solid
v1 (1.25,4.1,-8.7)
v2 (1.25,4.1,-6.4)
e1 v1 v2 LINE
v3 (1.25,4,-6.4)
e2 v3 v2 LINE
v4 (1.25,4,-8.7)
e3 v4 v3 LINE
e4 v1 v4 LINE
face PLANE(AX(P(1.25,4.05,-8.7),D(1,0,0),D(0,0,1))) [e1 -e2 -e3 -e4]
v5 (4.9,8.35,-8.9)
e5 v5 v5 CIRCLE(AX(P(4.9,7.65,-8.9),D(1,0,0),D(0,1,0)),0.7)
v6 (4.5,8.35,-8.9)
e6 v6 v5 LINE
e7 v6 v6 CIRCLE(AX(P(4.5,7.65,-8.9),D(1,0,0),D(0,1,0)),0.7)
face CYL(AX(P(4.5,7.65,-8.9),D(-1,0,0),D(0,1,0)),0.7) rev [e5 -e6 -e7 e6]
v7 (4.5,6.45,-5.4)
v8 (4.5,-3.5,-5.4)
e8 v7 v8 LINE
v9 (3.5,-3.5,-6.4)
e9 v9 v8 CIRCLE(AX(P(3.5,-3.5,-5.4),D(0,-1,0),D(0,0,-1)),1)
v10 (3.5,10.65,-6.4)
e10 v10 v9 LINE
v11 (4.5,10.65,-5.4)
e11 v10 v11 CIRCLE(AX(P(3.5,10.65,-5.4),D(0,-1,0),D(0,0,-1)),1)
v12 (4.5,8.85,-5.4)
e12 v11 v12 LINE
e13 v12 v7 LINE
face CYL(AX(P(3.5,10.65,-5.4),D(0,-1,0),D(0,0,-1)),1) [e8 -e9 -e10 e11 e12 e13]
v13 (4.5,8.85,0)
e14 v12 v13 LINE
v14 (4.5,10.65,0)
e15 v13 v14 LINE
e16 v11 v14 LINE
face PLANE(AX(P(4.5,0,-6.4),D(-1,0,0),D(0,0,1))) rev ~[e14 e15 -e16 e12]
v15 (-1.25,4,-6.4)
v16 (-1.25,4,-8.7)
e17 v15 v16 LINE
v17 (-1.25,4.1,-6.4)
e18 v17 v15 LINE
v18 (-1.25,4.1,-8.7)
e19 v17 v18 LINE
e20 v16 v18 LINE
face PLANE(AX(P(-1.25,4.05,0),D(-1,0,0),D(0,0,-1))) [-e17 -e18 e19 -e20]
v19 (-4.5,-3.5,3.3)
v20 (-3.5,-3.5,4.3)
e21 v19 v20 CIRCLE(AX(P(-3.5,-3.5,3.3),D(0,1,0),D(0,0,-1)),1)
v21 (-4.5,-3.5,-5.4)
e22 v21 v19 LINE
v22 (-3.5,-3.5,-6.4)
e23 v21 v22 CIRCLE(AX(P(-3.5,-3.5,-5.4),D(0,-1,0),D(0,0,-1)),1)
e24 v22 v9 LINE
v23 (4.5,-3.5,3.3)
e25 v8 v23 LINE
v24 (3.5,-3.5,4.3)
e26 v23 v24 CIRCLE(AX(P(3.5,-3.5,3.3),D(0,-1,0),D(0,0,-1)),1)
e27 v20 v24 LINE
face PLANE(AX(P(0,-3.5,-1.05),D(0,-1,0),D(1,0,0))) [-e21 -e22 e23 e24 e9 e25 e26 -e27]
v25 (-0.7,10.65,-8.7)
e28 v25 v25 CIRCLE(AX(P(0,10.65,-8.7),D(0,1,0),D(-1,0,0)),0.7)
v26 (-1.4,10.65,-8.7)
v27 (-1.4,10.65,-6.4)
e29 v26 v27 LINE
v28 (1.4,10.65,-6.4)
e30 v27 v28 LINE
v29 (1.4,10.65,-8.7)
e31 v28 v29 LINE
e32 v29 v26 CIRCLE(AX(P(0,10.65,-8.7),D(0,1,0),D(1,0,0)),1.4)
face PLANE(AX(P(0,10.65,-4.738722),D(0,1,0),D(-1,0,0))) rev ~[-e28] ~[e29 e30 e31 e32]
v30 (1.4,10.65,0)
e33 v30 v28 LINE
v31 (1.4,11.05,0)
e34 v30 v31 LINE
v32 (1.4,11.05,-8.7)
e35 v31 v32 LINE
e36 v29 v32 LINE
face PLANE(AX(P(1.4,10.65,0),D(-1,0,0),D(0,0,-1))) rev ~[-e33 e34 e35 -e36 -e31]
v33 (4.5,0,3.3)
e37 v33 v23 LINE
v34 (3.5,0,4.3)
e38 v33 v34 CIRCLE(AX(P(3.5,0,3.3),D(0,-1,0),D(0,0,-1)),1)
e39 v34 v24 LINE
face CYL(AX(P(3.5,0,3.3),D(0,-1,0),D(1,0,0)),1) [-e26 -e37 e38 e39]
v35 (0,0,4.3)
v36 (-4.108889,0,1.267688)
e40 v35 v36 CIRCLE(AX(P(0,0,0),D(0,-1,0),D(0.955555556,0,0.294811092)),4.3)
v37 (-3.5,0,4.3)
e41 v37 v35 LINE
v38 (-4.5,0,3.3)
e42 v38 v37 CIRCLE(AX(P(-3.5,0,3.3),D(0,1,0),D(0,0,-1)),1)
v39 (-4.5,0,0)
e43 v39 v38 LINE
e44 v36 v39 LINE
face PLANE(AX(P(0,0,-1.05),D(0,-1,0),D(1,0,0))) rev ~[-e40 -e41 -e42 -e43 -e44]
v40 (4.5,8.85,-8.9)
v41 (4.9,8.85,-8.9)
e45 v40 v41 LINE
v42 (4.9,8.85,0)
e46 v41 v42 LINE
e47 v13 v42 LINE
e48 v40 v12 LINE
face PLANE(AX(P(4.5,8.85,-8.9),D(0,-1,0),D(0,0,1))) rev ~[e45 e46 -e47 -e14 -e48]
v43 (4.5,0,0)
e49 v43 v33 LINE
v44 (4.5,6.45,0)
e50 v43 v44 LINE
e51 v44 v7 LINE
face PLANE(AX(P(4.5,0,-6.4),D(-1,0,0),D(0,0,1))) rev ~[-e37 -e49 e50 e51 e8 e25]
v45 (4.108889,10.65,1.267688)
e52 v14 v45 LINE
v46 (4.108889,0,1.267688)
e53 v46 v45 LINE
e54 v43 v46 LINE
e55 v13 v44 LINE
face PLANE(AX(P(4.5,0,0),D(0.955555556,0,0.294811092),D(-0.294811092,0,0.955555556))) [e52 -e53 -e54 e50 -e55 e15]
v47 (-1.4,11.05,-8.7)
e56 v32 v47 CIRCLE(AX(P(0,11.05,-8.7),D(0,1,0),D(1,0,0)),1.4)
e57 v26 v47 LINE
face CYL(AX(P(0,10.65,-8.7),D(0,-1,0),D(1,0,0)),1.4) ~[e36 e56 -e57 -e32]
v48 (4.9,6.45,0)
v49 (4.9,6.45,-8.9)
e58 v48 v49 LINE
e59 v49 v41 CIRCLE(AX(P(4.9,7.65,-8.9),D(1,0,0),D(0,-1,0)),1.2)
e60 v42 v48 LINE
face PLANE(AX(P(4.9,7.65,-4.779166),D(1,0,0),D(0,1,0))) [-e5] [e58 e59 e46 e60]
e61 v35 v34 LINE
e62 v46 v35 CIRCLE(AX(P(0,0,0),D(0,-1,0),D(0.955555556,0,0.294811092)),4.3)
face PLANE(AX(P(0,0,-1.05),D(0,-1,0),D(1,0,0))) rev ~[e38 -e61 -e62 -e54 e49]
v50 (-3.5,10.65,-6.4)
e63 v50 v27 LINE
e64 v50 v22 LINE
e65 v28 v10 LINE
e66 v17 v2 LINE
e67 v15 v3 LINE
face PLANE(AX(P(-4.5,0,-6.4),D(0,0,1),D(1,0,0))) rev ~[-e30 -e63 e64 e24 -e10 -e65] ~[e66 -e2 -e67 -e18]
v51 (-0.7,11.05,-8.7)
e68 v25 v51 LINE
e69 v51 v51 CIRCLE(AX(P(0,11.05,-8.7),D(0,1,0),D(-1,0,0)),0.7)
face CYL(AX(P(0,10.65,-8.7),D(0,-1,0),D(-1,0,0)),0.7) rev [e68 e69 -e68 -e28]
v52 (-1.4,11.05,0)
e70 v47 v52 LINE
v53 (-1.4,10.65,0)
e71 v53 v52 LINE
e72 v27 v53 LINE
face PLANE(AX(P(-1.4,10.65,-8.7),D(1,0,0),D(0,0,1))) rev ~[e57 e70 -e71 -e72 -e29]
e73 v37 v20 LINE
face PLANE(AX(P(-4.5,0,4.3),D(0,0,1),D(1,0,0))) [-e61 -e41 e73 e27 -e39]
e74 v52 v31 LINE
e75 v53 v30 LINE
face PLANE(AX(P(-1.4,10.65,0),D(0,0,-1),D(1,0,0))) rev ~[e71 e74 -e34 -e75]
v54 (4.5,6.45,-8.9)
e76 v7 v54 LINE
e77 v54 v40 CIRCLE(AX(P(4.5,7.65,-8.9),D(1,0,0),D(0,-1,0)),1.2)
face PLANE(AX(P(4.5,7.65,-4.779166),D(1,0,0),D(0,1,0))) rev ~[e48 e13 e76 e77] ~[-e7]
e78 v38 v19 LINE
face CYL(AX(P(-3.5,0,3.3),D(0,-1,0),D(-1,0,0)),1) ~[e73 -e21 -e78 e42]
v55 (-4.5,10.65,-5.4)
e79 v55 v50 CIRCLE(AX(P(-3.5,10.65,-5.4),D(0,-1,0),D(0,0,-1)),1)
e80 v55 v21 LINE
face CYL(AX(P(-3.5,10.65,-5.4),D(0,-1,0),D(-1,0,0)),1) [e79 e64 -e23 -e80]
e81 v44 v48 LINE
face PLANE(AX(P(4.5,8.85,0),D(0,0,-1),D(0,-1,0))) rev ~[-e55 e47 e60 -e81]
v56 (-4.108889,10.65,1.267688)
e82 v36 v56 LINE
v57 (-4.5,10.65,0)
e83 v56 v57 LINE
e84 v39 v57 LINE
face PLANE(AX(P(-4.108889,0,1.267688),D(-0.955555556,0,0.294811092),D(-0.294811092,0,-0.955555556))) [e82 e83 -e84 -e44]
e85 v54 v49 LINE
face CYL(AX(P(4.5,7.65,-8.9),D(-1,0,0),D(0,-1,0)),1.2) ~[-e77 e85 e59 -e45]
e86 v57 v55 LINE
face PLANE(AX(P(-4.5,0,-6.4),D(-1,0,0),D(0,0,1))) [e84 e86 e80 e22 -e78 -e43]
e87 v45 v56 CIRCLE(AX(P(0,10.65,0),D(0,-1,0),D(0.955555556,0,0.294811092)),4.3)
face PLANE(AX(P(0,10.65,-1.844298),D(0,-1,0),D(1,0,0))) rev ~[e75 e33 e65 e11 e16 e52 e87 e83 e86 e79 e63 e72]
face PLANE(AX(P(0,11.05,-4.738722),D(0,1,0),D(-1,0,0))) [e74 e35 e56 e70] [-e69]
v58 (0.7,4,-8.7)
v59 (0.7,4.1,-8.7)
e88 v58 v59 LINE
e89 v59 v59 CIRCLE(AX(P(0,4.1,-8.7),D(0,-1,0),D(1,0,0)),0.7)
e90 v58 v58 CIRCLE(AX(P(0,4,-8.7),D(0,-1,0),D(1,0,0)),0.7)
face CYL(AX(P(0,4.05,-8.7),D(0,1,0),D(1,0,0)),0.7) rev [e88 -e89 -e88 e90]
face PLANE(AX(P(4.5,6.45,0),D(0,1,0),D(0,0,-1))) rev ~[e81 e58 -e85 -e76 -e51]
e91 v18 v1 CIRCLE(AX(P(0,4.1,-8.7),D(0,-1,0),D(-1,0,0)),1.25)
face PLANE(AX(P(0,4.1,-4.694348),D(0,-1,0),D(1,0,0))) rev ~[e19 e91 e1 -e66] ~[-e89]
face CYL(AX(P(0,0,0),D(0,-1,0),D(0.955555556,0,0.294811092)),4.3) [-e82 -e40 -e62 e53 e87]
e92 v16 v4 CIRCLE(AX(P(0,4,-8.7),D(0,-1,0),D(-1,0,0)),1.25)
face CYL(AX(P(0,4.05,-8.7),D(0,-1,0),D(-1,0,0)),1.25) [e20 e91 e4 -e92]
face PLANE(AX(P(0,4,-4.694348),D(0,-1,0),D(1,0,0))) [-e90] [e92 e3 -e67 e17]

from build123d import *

# Parameters (mm, degrees)
F1_DEPTH  = 10.65
F2_W      = 9
F2_H      = 10.7
F3_DEPTH  = 3.5
F4_R      = 1
F5_R      = 0.7
F6_DEPTH  = 0.4
F7_R      = 0.7
F8_DEPTH  = 0.4
F10_R     = 0.7
F11_DEPTH = 0.05


with BuildPart() as f1:
    # F0 (on Front) → F1 (new body)
    with BuildSketch(Plane.XZ):
        with BuildLine():
            ThreePointArc((4.1088888889, 1.2676876976), (0, 4.3), (-4.1088888889, 1.2676876976))
            Line((-4.1088888889, 1.2676876976), (-4.5, 0))
            Line((-4.5, 0), (-4.5, -6.4))
            Line((-4.5, -6.4), (0, -6.4))
            Line((0, -6.4), (4.5, -6.4))
            Line((4.5, -6.4), (4.5, 0))
            Line((4.5, 0), (4.1088888889, 1.2676876976))
        make_face()
    extrude(amount=-F1_DEPTH)

    # F2 (on face) → F3 (join)
    with BuildSketch(Plane.XZ):
        with Locations((0, -1.05)):
            Rectangle(F2_W, F2_H)
    extrude(amount=F3_DEPTH)

    # F4
    f4_edges = [f1.edges().sort_by_distance(p)[0] for p in [
        (4.5, -1.75, 4.3),
        (-4.5, -1.75, 4.3),
        (4.5, 3.575, -6.4),
        (-4.5, 3.575, -6.4),
    ]]
    fillet(f4_edges, radius=F4_R)

    # F5 (on face) → F6 (join)
    with BuildSketch(Plane.YZ.offset(4.5)):
        with BuildLine():
            ThreePointArc((6.45, -8.9), (7.65, -10.1), (8.85, -8.9))
            Line((8.85, -8.9), (8.85, 0))
            Line((8.85, 0), (6.45, 0))
            Line((6.45, 0), (6.45, -8.9))
        make_face()
        with Locations((7.65, -8.9)):
            Circle(F5_R, mode=Mode.SUBTRACT)
    extrude(amount=F6_DEPTH)

    # F7 (on face) → F8 (join)
    with BuildSketch(Plane(origin=(0, 10.65, 0), x_dir=(-1, 0, 0), z_dir=(0, 1, 0))):
        with BuildLine():
            ThreePointArc((-1.4, -8.7), (0, -10.1), (1.4, -8.7))
            Line((1.4, -8.7), (1.4, 0))
            Line((1.4, 0), (-1.4, 0))
            Line((-1.4, 0), (-1.4, -8.7))
        make_face()
        with Locations((0, -8.7)):
            Circle(F7_R, mode=Mode.SUBTRACT)
    extrude(amount=F8_DEPTH)

    # F10 (on offset) → F11 (join, symmetric)
    with BuildSketch(Plane.XZ.offset(-4.05)):
        with BuildLine():
            ThreePointArc((-1.25, -8.7), (0, -9.95), (1.25, -8.7))
            Line((1.25, -8.7), (1.25, 0))
            Line((1.25, 0), (-1.25, 0))
            Line((-1.25, 0), (-1.25, -8.7))
        make_face()
        with Locations((0, -8.7)):
            Circle(F10_R, mode=Mode.SUBTRACT)
    extrude(amount=F11_DEPTH, both=True)


solid = f1.part
